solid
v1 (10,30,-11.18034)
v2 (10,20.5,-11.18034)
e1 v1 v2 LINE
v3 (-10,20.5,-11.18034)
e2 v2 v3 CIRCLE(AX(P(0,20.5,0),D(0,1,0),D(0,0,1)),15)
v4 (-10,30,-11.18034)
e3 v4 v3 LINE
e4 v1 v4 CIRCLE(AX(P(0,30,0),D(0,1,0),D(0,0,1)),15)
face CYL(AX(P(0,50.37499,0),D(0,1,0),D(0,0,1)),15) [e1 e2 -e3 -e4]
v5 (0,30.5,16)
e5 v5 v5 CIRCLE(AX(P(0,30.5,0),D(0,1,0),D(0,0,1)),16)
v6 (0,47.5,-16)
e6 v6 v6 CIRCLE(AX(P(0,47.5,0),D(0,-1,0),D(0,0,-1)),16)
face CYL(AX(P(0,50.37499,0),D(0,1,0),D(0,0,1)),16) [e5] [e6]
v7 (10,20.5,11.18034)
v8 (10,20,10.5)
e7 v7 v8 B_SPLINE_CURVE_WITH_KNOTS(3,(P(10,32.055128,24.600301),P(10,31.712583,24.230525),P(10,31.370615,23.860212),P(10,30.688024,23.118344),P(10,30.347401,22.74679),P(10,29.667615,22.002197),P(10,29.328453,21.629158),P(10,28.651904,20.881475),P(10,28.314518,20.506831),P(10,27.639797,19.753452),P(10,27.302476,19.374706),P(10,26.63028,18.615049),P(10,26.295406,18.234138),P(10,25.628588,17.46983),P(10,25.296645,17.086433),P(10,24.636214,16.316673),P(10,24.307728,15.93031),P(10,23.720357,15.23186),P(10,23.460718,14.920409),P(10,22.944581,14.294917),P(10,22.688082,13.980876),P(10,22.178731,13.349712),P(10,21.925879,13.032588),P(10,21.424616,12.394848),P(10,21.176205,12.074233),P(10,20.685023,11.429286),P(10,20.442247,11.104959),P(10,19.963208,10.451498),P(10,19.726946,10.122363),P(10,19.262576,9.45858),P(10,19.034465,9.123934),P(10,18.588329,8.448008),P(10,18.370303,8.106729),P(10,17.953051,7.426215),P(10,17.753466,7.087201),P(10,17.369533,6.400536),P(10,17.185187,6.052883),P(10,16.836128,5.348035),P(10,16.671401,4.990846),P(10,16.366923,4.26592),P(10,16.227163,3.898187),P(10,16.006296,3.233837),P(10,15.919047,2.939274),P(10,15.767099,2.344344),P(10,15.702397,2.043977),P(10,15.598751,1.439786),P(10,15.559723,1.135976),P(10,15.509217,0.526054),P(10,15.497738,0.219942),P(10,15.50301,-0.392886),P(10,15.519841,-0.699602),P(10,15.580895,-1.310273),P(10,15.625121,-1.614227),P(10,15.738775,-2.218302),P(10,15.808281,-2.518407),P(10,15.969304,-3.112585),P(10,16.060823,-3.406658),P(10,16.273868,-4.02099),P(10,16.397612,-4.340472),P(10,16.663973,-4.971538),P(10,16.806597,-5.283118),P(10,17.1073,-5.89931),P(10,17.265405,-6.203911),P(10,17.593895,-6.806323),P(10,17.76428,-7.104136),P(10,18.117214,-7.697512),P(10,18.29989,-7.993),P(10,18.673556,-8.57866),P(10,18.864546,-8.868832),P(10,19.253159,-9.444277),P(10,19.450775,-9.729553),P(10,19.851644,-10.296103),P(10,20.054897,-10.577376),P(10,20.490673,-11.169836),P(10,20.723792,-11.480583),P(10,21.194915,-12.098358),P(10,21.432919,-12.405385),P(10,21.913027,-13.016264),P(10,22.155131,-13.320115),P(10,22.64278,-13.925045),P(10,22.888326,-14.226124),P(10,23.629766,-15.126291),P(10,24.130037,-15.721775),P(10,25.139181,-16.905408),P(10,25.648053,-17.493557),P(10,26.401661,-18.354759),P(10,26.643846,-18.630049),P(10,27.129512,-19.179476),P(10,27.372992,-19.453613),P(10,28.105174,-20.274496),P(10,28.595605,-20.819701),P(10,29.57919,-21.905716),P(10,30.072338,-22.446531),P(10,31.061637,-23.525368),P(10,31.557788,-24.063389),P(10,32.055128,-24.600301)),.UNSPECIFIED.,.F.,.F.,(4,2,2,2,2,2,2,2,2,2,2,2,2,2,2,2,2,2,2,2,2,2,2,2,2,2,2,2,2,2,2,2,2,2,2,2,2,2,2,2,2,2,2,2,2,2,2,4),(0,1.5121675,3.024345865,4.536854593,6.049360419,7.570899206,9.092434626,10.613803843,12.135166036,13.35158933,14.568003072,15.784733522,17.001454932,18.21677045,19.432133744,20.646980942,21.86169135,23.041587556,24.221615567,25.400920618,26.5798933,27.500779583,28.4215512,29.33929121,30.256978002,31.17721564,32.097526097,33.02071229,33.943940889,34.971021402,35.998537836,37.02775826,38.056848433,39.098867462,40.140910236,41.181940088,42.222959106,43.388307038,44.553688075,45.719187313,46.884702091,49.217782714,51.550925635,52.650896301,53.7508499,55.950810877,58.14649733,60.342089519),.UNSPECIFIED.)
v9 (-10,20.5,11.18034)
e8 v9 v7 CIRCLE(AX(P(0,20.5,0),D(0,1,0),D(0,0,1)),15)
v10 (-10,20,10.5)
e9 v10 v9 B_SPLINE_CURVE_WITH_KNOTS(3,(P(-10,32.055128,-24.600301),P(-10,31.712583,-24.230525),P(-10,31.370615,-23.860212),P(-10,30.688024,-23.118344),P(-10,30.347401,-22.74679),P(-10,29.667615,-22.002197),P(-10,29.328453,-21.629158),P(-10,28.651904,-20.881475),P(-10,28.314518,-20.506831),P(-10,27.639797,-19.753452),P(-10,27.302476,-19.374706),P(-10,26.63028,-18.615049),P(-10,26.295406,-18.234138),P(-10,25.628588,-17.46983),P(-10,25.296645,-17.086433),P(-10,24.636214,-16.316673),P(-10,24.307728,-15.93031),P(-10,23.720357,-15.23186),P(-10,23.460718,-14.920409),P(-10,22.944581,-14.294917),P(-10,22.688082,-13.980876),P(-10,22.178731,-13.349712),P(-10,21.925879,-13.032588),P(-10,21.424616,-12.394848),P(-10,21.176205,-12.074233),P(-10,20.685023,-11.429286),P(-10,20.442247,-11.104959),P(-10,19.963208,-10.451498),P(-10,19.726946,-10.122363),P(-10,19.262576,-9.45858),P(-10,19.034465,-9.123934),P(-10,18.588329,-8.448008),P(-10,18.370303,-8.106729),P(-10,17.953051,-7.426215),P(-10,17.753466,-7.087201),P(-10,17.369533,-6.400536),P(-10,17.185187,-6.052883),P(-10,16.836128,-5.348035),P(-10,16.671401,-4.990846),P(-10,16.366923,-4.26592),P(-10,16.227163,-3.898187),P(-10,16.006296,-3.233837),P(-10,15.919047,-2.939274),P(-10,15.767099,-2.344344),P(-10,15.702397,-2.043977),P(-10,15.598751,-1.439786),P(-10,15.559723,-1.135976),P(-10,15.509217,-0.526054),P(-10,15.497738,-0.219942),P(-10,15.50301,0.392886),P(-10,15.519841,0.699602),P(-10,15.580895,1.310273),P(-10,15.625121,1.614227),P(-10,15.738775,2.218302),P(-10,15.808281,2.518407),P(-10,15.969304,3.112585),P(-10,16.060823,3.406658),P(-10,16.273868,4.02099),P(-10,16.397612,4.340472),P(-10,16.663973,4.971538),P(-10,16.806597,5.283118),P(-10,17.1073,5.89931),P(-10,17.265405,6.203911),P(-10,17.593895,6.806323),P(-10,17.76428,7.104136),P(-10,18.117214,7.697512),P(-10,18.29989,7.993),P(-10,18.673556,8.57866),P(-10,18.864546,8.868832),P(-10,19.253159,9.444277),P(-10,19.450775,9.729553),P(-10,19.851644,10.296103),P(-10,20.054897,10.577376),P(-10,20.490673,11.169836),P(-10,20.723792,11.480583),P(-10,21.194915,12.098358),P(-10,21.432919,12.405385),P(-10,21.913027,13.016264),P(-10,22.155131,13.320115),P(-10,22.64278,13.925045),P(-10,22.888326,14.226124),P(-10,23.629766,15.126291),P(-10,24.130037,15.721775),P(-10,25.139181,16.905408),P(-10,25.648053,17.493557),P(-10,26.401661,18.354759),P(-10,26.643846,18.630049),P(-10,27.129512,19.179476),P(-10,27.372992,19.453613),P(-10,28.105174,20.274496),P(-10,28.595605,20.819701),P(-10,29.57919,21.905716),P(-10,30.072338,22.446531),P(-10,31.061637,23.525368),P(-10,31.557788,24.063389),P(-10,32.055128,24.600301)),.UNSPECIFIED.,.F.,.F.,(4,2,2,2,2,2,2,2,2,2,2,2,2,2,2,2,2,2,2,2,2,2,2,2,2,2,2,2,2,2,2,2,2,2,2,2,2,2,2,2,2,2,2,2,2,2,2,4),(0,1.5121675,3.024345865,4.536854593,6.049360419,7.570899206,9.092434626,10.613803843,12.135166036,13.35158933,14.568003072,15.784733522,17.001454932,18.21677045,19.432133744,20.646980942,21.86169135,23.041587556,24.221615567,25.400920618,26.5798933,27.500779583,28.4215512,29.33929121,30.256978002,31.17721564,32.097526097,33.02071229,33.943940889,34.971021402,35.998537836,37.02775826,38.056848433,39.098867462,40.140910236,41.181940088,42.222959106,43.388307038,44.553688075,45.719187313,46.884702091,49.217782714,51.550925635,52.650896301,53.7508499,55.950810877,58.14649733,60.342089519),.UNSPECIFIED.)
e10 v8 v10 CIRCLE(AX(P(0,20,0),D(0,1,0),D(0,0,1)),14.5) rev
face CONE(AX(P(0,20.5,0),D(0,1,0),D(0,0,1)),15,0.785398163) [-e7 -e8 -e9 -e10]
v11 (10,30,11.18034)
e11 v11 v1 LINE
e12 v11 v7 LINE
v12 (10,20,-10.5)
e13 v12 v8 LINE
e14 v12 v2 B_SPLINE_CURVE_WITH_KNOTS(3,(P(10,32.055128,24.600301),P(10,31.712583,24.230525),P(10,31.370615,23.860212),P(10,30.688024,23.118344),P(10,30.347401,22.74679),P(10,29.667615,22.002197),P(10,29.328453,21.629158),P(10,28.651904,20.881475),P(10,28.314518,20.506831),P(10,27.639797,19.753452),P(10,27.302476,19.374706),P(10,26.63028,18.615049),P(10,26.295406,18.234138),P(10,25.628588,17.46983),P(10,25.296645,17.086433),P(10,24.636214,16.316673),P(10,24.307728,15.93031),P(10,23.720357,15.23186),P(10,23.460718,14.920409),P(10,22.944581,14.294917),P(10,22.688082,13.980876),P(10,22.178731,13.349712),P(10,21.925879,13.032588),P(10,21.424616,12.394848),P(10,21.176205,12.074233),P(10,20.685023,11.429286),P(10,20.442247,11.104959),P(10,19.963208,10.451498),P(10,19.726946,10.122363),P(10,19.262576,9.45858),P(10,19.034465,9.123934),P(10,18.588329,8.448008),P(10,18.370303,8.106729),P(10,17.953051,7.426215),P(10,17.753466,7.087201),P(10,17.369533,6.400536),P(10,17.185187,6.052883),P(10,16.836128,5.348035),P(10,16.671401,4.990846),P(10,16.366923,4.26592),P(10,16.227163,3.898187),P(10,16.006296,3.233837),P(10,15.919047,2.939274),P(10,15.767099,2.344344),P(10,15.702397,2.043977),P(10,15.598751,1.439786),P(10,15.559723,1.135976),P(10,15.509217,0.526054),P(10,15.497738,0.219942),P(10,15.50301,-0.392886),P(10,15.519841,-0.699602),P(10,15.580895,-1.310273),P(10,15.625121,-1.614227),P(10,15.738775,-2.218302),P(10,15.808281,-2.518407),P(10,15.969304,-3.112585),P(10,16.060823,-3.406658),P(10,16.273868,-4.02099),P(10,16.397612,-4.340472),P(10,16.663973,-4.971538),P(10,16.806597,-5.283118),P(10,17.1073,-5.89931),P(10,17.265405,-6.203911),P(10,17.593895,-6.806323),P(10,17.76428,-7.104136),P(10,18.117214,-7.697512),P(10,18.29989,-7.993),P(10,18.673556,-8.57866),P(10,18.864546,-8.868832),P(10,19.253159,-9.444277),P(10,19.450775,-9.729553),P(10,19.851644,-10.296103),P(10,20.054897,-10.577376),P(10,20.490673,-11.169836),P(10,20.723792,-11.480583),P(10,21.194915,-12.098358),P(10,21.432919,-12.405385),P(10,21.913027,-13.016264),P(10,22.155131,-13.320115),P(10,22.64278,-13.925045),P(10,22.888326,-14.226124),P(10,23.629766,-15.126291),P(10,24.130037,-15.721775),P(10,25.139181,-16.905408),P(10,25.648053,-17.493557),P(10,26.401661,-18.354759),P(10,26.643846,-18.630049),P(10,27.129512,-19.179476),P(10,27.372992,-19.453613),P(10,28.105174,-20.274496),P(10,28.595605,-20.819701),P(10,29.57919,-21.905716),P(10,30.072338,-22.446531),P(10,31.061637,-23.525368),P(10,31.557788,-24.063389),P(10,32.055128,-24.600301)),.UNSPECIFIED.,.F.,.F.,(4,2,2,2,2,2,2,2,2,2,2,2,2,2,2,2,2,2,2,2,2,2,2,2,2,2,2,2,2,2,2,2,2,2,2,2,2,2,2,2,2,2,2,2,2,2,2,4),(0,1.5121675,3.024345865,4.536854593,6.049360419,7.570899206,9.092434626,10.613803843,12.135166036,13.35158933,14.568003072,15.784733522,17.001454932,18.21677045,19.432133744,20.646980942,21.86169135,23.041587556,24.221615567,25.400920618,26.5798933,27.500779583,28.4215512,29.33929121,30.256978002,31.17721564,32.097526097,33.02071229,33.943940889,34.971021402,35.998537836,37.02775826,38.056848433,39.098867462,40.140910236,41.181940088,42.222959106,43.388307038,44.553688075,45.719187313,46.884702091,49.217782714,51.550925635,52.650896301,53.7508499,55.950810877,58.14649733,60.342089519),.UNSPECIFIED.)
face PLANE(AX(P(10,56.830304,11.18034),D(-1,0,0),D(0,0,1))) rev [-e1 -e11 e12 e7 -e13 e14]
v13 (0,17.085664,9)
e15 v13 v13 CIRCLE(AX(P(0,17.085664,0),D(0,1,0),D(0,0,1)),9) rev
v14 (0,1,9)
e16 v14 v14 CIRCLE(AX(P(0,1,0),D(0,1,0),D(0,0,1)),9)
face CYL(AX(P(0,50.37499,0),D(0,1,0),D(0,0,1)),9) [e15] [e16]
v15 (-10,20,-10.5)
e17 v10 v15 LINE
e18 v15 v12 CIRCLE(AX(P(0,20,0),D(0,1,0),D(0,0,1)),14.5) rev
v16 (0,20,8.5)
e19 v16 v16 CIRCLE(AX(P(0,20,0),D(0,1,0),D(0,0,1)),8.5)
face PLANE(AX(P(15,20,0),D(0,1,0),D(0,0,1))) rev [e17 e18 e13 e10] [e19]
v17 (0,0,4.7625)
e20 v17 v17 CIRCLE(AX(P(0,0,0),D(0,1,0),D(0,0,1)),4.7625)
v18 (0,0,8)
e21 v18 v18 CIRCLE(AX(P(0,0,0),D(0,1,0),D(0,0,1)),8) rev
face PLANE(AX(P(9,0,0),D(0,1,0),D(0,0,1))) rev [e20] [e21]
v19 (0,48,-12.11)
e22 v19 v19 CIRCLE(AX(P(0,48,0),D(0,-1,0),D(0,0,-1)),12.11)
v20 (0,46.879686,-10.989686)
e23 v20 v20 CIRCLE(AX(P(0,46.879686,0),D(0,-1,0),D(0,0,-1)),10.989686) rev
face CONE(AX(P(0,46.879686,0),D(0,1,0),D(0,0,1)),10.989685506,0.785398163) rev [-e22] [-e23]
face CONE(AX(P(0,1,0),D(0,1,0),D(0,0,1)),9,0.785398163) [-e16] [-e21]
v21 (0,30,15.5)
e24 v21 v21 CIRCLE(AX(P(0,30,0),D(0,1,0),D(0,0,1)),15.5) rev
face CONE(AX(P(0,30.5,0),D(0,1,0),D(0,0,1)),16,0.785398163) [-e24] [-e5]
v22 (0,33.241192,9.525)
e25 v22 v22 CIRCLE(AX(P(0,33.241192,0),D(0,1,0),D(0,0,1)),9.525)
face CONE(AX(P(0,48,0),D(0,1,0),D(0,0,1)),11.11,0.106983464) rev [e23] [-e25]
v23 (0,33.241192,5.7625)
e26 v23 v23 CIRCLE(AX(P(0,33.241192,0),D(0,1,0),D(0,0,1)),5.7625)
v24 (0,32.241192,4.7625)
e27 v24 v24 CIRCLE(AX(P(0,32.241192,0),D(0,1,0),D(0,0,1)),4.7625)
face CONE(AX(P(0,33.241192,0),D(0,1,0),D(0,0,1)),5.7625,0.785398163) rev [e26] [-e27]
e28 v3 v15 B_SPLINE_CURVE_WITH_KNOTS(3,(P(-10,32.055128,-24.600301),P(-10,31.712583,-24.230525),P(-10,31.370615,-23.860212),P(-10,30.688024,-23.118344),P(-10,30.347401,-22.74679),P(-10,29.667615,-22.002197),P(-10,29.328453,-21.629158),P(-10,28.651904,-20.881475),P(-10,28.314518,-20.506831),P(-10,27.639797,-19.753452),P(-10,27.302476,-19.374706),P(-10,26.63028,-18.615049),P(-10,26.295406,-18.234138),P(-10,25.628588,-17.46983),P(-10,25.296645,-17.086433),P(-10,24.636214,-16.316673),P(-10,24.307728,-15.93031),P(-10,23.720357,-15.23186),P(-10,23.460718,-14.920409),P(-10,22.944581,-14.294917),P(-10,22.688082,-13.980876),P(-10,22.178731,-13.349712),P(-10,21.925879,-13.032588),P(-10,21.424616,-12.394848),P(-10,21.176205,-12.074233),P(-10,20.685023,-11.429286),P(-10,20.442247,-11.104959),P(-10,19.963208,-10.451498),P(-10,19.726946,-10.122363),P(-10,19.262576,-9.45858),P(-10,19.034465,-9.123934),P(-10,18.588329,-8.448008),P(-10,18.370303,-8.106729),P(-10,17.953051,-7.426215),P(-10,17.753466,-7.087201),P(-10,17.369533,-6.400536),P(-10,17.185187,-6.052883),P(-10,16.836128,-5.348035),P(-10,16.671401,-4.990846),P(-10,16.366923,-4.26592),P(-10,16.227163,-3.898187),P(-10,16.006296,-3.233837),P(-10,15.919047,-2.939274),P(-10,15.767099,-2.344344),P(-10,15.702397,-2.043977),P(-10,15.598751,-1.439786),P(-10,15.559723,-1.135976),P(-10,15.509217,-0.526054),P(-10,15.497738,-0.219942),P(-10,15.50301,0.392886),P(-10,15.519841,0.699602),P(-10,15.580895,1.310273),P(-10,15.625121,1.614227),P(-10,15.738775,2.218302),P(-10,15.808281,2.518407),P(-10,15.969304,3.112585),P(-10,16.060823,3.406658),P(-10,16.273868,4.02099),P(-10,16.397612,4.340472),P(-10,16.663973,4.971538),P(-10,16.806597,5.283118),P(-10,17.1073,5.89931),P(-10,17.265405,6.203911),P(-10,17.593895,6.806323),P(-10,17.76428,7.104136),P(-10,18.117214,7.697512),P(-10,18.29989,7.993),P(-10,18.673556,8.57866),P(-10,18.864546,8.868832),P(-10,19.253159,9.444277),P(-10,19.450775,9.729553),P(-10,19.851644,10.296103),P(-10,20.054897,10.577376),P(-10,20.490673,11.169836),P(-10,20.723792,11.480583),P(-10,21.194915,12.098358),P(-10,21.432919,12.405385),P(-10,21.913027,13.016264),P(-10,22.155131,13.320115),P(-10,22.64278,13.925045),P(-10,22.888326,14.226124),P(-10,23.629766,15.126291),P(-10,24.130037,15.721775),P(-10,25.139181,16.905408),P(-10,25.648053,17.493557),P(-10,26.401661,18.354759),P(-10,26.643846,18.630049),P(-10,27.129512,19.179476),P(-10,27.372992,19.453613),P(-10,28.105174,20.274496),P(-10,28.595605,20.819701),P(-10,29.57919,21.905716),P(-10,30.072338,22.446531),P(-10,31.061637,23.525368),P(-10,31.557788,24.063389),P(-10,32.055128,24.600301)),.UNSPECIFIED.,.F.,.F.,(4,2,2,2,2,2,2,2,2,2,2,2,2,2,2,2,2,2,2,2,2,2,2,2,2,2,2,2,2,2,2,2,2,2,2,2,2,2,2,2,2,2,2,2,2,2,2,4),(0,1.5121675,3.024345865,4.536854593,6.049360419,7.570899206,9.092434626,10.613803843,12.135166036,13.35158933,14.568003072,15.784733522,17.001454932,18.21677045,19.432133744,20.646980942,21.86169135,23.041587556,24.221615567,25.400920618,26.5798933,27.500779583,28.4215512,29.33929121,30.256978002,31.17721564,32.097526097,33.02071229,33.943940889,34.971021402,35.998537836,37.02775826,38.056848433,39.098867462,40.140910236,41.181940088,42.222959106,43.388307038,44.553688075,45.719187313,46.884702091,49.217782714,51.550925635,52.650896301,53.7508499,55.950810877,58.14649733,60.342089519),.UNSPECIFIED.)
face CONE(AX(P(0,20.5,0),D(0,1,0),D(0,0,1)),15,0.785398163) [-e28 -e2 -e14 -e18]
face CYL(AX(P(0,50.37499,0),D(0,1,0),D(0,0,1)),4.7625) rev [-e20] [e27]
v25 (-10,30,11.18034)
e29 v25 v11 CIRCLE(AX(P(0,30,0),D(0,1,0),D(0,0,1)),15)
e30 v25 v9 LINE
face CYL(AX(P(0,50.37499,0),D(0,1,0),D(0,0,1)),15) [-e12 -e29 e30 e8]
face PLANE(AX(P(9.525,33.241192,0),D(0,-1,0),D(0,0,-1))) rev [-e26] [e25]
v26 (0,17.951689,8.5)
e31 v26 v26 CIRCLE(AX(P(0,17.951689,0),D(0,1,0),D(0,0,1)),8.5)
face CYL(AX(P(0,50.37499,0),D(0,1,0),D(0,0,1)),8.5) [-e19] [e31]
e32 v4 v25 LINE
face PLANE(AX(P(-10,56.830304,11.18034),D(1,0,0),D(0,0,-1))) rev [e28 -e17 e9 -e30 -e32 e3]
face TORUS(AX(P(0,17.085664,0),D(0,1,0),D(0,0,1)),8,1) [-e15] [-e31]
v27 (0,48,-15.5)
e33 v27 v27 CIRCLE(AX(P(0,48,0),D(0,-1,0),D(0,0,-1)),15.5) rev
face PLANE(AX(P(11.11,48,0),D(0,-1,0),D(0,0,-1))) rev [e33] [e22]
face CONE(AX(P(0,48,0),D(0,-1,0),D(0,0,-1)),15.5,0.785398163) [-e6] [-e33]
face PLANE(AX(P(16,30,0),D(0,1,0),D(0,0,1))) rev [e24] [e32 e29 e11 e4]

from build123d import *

# Parameters (mm, degrees)
CHAFL_N1_SIZE         = 1
REDONDEO1_R           = 1
CHAFL_N2_SIZE         = 0.5
CROQUIS3_W            = 14.730869345
CROQUIS3_H            = 22.360679774
CORTAR_EXTRUIR1_DEPTH = 30
CHAFL_N3_SIZE         = 1
CHAFL_N3_SIZE2        = 1.12675647


with BuildPart() as part:
    # Croquis1 → Revolución1 (revolve)
    with BuildSketch(Plane.XY, mode=Mode.PRIVATE) as revoluci_n1_sk:
        Polygon((11.11, 48), (16, 48), (16, 30), (15, 30), (15, 20), (8.5, 20), (8.5, 17.951688966), (9, 17.951688966), (9, 0), (4.7625, 0), (4.7625, 32.24119236), (5.7625, 33.24119236), (9.525, 33.24119236), align=None)
    revolve(revoluci_n1_sk.sketch.rotate(Axis((0, 50.374990084, 0), (0, -1, 0)), 90), axis=Axis((0, 50.374990084, 0), (0, -1, 0)))

    # Chaflán1
    chafl_n1_edges = [part.edges().sort_by_distance(p)[0] for p in [
        (0, 0, -9),
    ]]
    chamfer(chafl_n1_edges, length=CHAFL_N1_SIZE)

    # Redondeo1
    # the kernel refuses this fillet: 1 mm, written as the material it takes off along each edge
    with BuildSketch(Plane(origin=(0, 17.951688966, 0), x_dir=(0, 0, 1), z_dir=(1, 0, 0))) as redondeo1_piece_1:
        with BuildLine():
            CenterArc((8, 0.866025404), REDONDEO1_R, 300, 60)
            Line((8.5, 0), (8.51, -0.017320508))
            ThreePointArc((8.51, -0.017320508), (8.75, -0.02), (9, -0.02))
            Line((9, -0.02), (9.02, 0))
            Line((9.02, 0), (9.02, 0.866025404))
            Line((9.02, 0.866025404), (9, 0.866025404))
        make_face()
    revolve(axis=Axis((0, 17.951688966, 0), (0, -1, 0)), mode=Mode.SUBTRACT)

    # Chaflán2
    chafl_n2_edges = [part.edges().sort_by_distance(p)[0] for p in [
        (0, 20, -15),
        (0, 30, -16),
        (0, 48, -16),
    ]]
    chamfer(chafl_n2_edges, length=CHAFL_N2_SIZE)

    # Croquis3 → Cortar-Extruir1 (cut)
    with BuildSketch(Plane.XZ):
        Polygon((10, 11.180339887), (10, -11.180339887), (24.245950338, -11.180339887), (24.827853146, 11.180339887), align=None)
        with Locations((-17.365434673, 0)):
            Rectangle(CROQUIS3_W, CROQUIS3_H)
    extrude(amount=-CORTAR_EXTRUIR1_DEPTH, mode=Mode.SUBTRACT)

    # Chaflán3
    chafl_n3_edges = [part.edges().sort_by_distance(p)[0] for p in [
        (0, 48, -11.11),
    ]]
    chafl_n3_side = [part.faces().sort_by_distance(p)[0] for p in [
        (0, 48, -15.061593796),
    ]]
    chamfer(chafl_n3_edges, length=CHAFL_N3_SIZE, length2=CHAFL_N3_SIZE2, reference=chafl_n3_side[0])


solid = part.part
